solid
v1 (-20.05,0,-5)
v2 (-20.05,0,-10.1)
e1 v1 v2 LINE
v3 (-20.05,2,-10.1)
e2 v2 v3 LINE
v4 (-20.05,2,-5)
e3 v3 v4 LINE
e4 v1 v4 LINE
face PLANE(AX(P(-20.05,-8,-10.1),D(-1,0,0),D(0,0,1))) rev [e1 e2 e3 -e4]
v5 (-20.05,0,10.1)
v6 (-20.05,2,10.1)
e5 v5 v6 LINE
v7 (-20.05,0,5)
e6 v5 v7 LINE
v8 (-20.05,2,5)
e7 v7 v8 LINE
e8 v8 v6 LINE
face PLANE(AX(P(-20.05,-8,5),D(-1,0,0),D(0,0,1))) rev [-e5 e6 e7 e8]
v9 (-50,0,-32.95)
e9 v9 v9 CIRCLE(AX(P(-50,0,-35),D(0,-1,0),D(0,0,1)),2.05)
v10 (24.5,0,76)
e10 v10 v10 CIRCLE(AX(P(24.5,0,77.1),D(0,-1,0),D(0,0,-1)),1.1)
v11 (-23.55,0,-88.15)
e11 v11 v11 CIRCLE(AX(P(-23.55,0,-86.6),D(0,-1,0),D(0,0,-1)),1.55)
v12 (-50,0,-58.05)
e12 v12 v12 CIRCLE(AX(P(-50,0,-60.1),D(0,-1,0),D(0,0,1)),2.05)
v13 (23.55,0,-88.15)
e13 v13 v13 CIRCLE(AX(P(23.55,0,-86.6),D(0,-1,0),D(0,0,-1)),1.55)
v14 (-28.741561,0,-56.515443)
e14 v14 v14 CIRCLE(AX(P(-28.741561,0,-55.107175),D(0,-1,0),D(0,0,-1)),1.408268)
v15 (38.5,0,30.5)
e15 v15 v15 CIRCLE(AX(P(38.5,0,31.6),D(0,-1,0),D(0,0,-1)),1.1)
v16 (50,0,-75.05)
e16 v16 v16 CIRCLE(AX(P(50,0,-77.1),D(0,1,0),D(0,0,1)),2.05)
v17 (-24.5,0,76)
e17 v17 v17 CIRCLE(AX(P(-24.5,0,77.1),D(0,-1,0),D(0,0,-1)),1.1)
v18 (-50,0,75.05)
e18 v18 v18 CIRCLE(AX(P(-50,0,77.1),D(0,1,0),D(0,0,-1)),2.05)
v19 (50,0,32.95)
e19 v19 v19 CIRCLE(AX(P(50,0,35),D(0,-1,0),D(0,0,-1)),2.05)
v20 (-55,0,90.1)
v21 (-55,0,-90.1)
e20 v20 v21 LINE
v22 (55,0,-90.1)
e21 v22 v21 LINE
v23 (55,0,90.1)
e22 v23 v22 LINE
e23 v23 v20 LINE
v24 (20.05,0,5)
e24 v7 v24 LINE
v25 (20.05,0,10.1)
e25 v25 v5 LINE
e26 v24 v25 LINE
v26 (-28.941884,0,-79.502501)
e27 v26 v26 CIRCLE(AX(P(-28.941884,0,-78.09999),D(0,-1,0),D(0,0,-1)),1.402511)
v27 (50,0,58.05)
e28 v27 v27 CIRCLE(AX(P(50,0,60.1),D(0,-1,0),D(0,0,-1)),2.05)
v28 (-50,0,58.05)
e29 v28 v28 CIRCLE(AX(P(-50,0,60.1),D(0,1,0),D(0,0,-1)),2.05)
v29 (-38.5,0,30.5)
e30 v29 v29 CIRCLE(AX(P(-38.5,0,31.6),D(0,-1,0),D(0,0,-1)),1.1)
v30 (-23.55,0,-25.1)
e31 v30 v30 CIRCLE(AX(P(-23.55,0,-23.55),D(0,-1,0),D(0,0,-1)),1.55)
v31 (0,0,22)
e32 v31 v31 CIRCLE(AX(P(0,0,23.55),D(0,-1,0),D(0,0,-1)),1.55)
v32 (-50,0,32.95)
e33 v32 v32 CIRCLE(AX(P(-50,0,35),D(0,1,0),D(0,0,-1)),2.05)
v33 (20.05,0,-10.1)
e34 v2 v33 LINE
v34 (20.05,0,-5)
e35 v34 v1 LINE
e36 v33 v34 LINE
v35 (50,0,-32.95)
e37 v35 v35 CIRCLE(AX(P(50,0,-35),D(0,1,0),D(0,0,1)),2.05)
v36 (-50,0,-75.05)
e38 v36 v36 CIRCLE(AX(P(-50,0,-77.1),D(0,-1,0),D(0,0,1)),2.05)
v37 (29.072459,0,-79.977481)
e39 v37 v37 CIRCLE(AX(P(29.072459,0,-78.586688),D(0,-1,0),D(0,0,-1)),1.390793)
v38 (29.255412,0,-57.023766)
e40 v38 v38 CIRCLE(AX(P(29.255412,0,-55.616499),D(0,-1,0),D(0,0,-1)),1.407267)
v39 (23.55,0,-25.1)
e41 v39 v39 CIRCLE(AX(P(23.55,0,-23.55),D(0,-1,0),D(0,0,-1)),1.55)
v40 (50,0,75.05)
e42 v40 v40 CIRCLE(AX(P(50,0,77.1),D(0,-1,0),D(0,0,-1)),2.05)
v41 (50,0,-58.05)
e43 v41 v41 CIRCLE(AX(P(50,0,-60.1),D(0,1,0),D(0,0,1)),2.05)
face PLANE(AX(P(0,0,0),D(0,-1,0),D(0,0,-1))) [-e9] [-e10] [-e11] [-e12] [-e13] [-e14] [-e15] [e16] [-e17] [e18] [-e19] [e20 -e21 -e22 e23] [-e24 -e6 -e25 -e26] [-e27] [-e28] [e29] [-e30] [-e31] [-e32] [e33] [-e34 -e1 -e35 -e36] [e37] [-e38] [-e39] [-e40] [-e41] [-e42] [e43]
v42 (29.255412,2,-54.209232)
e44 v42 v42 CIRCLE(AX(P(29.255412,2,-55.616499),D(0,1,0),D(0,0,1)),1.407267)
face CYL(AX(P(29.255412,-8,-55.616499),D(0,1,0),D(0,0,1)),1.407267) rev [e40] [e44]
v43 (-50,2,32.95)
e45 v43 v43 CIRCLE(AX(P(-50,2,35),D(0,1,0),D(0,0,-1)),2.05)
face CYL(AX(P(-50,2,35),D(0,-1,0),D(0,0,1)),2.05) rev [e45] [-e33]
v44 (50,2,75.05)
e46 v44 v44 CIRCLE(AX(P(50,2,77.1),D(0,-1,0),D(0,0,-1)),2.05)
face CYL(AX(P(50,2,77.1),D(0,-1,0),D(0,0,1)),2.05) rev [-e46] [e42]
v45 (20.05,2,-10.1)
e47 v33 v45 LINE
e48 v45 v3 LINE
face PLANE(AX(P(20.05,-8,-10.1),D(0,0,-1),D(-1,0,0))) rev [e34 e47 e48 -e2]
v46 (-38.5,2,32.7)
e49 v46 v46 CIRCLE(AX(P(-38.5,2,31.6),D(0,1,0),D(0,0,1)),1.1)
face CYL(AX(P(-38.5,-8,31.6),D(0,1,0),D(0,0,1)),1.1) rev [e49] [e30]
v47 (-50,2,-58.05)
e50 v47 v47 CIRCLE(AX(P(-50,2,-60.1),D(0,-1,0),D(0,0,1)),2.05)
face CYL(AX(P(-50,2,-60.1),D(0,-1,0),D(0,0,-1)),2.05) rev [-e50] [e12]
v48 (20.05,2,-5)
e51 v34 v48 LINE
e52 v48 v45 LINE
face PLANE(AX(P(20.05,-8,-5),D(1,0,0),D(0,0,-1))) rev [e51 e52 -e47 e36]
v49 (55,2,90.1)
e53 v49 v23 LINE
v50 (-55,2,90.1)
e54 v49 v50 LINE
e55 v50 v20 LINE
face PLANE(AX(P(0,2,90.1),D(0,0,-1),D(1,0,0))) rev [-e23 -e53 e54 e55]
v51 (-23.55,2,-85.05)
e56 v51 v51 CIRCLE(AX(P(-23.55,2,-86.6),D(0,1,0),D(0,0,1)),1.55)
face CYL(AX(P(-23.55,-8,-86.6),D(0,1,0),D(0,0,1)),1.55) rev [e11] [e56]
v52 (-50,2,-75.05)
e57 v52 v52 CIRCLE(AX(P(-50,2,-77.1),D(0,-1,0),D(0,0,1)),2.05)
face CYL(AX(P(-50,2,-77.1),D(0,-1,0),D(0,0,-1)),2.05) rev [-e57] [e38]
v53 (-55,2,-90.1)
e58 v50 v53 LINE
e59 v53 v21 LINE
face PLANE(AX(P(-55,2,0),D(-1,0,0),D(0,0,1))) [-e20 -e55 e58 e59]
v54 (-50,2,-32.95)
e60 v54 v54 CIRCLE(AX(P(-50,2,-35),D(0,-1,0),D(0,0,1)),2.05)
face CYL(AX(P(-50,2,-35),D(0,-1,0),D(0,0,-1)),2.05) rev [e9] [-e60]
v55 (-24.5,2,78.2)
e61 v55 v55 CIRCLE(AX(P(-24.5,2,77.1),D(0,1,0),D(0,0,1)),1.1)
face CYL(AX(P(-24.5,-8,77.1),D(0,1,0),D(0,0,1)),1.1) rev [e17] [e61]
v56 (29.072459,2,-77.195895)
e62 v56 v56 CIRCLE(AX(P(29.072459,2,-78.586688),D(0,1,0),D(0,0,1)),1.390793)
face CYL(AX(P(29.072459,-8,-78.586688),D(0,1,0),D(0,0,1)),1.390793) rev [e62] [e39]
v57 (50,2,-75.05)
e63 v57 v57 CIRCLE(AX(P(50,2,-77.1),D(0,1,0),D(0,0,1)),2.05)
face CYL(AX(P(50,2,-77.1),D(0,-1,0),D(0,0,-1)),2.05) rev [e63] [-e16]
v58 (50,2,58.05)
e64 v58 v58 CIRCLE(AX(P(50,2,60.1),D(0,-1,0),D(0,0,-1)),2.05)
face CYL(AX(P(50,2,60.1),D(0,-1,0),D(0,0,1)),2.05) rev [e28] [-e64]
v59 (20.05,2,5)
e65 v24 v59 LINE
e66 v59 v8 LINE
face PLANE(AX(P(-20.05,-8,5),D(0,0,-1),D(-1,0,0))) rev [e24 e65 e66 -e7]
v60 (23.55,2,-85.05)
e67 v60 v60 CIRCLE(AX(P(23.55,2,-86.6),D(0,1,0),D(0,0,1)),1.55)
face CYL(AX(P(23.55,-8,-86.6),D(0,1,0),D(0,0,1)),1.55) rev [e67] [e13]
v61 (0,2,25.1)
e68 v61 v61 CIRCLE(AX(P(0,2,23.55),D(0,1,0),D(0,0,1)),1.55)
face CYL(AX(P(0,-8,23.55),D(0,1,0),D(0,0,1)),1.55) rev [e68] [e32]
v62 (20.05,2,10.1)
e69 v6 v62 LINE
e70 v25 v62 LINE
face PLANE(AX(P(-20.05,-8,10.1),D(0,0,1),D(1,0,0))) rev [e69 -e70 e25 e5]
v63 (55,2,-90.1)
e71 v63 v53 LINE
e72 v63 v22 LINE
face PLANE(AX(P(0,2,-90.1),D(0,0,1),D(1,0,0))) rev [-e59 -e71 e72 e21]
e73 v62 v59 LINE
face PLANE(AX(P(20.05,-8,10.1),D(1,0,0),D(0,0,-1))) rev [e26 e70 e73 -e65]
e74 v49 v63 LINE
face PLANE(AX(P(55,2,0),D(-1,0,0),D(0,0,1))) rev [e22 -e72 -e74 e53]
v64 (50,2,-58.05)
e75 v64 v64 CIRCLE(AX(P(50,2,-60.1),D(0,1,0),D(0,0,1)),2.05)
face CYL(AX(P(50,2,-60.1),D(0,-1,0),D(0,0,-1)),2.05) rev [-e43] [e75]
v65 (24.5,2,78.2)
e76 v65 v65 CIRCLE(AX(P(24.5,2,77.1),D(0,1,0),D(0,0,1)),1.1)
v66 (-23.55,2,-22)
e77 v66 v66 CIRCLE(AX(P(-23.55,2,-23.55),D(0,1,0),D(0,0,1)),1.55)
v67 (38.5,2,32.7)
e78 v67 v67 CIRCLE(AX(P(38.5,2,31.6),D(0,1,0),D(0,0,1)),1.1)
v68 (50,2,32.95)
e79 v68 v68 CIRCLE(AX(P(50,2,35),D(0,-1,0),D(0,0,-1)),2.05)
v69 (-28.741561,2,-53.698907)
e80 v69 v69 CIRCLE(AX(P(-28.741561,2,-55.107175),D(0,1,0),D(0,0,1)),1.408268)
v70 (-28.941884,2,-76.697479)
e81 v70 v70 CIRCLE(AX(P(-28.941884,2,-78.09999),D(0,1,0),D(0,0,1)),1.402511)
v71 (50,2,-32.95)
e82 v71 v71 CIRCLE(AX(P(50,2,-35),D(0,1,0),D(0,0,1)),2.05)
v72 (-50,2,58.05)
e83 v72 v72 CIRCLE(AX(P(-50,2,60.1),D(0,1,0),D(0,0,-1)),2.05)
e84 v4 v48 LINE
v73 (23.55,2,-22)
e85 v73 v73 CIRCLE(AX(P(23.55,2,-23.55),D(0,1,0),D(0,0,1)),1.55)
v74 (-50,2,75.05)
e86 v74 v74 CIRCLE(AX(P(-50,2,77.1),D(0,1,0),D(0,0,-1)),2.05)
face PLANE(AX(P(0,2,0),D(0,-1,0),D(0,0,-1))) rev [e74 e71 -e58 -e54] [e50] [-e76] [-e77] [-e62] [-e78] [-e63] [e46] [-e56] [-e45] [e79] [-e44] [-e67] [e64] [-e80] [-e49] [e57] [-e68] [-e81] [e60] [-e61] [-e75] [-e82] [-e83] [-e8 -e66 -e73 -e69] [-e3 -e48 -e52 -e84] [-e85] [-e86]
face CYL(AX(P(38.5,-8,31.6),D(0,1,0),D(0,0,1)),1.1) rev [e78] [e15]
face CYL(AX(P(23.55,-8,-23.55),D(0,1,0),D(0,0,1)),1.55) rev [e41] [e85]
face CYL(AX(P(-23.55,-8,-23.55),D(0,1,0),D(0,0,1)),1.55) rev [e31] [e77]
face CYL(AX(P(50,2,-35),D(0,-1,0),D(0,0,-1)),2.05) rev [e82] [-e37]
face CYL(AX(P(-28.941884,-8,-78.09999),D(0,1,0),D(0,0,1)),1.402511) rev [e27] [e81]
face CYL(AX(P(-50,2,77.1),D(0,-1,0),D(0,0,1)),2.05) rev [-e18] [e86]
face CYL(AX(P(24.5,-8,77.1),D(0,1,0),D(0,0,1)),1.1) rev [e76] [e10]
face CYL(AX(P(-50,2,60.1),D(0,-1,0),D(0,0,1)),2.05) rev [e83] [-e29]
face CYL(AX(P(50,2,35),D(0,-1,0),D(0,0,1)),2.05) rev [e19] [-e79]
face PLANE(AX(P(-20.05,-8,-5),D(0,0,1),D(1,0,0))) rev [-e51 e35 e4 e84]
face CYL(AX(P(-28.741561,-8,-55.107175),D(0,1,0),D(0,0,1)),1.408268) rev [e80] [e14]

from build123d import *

# Parameters (mm, degrees)
SKETCH1_W           = 55
SKETCH1_H           = 90.1
SKETCH1_R           = 2.05
BOSS_EXTRUDE2_DEPTH = 2
MIRROR1_OUTLINE_W   = 55
MIRROR1_OUTLINE_H   = 90.1
MIRROR1_OUTLINE_R   = 2.05
MIRROR1_DEPTH       = 2
SKETCH2_W           = 40.1
SKETCH2_H           = 5.1
CUT_EXTRUDE1_DEPTH  = 10
SKETCH3_R           = 1.1
SKETCH3_R_2         = 1.55
SKETCH3_R_3         = 1.390793096
SKETCH3_R_4         = 1.407266862
SKETCH3_R_5         = 1.402510713
SKETCH3_R_6         = 1.408268023
CUT_EXTRUDE2_DEPTH  = 10


# Read off the part's stored shape, not the designer's step: Mirror1
with BuildPart() as part:
    # Sketch1 → Boss-Extrude2 (new body)
    with BuildSketch(Plane(origin=(0, 0, 0), x_dir=(1, 0, 0), z_dir=(0, 1, 0))):
        with Locations((27.5, 45.05)):
            Rectangle(SKETCH1_W, SKETCH1_H)
        with Locations(Location((50, 77.1, 0), (0, 0, 270))):
            Circle(SKETCH1_R, mode=Mode.SUBTRACT)
        with Locations(Location((50, 60.1, 0), (0, 0, 270))):
            Circle(SKETCH1_R, mode=Mode.SUBTRACT)
        with Locations(Location((50, 35, 0), (0, 0, 270))):
            Circle(SKETCH1_R, mode=Mode.SUBTRACT)
    extrude(amount=BOSS_EXTRUDE2_DEPTH)

    # Mirror1 outline → Mirror1 (add)
    with BuildSketch(Plane(origin=(0, 0, 0), x_dir=(1, 0, 0), z_dir=(0, 1, 0))):
        with Locations((-27.5, 45.05)):
            Rectangle(MIRROR1_OUTLINE_W, MIRROR1_OUTLINE_H)
        with Locations((-50, 35)):
            Circle(MIRROR1_OUTLINE_R, mode=Mode.SUBTRACT)
        with Locations((-50, 60.1)):
            Circle(MIRROR1_OUTLINE_R, mode=Mode.SUBTRACT)
        with Locations((-50, 77.1)):
            Circle(MIRROR1_OUTLINE_R, mode=Mode.SUBTRACT)
    extrude(amount=MIRROR1_DEPTH)

    # Mirror2: part across plane


with BuildPart() as part_1:
    add(part.part)
    add(part.part.mirror(Plane(origin=(0, 2, 0), x_dir=(1, 0, 0), z_dir=(0, 0, -1))))

    # Sketch2 → Cut-Extrude1 (cut)
    with BuildSketch(Plane(origin=(0, 2, 0), x_dir=(1, 0, 0), z_dir=(0, 1, 0))):
        with Locations((0, 7.55)):
            Rectangle(SKETCH2_W, SKETCH2_H)
        with Locations((0, -7.55)):
            Rectangle(SKETCH2_W, SKETCH2_H)
    extrude(amount=-CUT_EXTRUDE1_DEPTH, mode=Mode.SUBTRACT)

    # Sketch3 → Cut-Extrude2 (cut)
    with BuildSketch(Plane(origin=(0, 2, 0), x_dir=(1, 0, 0), z_dir=(0, 1, 0))):
        with Locations(Location((-24.5, -77.1, 0), (0, 0, 270))):
            Circle(SKETCH3_R)
        with Locations(Location((24.5, -77.1, 0), (0, 0, 270))):
            Circle(SKETCH3_R)
        with Locations(Location((-38.5, -31.6, 0), (0, 0, 270))):
            Circle(SKETCH3_R)
        with Locations(Location((38.5, -31.6, 0), (0, 0, 270))):
            Circle(SKETCH3_R)
        with Locations(Location((23.55, 86.6, 0), (0, 0, 270))):
            Circle(SKETCH3_R_2)
        with Locations(Location((23.55, 23.55, 0), (0, 0, 270))):
            Circle(SKETCH3_R_2)
        with Locations(Location((-23.55, 86.6, 0), (0, 0, 270))):
            Circle(SKETCH3_R_2)
        with Locations(Location((-23.55, 23.55, 0), (0, 0, 270))):
            Circle(SKETCH3_R_2)
        with Locations(Location((0, -23.55, 0), (0, 0, 270))):
            Circle(SKETCH3_R_2)
        with Locations(Location((29.072459347, 78.586687626, 0), (0, 0, 270))):
            Circle(SKETCH3_R_3)
        with Locations(Location((29.255411637, 55.616498658, 0), (0, 0, 270))):
            Circle(SKETCH3_R_4)
        with Locations(Location((-28.941884451, 78.099990066, 0), (0, 0, 270))):
            Circle(SKETCH3_R_5)
        with Locations(Location((-28.741560934, 55.107175023, 0), (0, 0, 270))):
            Circle(SKETCH3_R_6)
    extrude(amount=-CUT_EXTRUDE2_DEPTH, mode=Mode.SUBTRACT)


solid = part_1.part
